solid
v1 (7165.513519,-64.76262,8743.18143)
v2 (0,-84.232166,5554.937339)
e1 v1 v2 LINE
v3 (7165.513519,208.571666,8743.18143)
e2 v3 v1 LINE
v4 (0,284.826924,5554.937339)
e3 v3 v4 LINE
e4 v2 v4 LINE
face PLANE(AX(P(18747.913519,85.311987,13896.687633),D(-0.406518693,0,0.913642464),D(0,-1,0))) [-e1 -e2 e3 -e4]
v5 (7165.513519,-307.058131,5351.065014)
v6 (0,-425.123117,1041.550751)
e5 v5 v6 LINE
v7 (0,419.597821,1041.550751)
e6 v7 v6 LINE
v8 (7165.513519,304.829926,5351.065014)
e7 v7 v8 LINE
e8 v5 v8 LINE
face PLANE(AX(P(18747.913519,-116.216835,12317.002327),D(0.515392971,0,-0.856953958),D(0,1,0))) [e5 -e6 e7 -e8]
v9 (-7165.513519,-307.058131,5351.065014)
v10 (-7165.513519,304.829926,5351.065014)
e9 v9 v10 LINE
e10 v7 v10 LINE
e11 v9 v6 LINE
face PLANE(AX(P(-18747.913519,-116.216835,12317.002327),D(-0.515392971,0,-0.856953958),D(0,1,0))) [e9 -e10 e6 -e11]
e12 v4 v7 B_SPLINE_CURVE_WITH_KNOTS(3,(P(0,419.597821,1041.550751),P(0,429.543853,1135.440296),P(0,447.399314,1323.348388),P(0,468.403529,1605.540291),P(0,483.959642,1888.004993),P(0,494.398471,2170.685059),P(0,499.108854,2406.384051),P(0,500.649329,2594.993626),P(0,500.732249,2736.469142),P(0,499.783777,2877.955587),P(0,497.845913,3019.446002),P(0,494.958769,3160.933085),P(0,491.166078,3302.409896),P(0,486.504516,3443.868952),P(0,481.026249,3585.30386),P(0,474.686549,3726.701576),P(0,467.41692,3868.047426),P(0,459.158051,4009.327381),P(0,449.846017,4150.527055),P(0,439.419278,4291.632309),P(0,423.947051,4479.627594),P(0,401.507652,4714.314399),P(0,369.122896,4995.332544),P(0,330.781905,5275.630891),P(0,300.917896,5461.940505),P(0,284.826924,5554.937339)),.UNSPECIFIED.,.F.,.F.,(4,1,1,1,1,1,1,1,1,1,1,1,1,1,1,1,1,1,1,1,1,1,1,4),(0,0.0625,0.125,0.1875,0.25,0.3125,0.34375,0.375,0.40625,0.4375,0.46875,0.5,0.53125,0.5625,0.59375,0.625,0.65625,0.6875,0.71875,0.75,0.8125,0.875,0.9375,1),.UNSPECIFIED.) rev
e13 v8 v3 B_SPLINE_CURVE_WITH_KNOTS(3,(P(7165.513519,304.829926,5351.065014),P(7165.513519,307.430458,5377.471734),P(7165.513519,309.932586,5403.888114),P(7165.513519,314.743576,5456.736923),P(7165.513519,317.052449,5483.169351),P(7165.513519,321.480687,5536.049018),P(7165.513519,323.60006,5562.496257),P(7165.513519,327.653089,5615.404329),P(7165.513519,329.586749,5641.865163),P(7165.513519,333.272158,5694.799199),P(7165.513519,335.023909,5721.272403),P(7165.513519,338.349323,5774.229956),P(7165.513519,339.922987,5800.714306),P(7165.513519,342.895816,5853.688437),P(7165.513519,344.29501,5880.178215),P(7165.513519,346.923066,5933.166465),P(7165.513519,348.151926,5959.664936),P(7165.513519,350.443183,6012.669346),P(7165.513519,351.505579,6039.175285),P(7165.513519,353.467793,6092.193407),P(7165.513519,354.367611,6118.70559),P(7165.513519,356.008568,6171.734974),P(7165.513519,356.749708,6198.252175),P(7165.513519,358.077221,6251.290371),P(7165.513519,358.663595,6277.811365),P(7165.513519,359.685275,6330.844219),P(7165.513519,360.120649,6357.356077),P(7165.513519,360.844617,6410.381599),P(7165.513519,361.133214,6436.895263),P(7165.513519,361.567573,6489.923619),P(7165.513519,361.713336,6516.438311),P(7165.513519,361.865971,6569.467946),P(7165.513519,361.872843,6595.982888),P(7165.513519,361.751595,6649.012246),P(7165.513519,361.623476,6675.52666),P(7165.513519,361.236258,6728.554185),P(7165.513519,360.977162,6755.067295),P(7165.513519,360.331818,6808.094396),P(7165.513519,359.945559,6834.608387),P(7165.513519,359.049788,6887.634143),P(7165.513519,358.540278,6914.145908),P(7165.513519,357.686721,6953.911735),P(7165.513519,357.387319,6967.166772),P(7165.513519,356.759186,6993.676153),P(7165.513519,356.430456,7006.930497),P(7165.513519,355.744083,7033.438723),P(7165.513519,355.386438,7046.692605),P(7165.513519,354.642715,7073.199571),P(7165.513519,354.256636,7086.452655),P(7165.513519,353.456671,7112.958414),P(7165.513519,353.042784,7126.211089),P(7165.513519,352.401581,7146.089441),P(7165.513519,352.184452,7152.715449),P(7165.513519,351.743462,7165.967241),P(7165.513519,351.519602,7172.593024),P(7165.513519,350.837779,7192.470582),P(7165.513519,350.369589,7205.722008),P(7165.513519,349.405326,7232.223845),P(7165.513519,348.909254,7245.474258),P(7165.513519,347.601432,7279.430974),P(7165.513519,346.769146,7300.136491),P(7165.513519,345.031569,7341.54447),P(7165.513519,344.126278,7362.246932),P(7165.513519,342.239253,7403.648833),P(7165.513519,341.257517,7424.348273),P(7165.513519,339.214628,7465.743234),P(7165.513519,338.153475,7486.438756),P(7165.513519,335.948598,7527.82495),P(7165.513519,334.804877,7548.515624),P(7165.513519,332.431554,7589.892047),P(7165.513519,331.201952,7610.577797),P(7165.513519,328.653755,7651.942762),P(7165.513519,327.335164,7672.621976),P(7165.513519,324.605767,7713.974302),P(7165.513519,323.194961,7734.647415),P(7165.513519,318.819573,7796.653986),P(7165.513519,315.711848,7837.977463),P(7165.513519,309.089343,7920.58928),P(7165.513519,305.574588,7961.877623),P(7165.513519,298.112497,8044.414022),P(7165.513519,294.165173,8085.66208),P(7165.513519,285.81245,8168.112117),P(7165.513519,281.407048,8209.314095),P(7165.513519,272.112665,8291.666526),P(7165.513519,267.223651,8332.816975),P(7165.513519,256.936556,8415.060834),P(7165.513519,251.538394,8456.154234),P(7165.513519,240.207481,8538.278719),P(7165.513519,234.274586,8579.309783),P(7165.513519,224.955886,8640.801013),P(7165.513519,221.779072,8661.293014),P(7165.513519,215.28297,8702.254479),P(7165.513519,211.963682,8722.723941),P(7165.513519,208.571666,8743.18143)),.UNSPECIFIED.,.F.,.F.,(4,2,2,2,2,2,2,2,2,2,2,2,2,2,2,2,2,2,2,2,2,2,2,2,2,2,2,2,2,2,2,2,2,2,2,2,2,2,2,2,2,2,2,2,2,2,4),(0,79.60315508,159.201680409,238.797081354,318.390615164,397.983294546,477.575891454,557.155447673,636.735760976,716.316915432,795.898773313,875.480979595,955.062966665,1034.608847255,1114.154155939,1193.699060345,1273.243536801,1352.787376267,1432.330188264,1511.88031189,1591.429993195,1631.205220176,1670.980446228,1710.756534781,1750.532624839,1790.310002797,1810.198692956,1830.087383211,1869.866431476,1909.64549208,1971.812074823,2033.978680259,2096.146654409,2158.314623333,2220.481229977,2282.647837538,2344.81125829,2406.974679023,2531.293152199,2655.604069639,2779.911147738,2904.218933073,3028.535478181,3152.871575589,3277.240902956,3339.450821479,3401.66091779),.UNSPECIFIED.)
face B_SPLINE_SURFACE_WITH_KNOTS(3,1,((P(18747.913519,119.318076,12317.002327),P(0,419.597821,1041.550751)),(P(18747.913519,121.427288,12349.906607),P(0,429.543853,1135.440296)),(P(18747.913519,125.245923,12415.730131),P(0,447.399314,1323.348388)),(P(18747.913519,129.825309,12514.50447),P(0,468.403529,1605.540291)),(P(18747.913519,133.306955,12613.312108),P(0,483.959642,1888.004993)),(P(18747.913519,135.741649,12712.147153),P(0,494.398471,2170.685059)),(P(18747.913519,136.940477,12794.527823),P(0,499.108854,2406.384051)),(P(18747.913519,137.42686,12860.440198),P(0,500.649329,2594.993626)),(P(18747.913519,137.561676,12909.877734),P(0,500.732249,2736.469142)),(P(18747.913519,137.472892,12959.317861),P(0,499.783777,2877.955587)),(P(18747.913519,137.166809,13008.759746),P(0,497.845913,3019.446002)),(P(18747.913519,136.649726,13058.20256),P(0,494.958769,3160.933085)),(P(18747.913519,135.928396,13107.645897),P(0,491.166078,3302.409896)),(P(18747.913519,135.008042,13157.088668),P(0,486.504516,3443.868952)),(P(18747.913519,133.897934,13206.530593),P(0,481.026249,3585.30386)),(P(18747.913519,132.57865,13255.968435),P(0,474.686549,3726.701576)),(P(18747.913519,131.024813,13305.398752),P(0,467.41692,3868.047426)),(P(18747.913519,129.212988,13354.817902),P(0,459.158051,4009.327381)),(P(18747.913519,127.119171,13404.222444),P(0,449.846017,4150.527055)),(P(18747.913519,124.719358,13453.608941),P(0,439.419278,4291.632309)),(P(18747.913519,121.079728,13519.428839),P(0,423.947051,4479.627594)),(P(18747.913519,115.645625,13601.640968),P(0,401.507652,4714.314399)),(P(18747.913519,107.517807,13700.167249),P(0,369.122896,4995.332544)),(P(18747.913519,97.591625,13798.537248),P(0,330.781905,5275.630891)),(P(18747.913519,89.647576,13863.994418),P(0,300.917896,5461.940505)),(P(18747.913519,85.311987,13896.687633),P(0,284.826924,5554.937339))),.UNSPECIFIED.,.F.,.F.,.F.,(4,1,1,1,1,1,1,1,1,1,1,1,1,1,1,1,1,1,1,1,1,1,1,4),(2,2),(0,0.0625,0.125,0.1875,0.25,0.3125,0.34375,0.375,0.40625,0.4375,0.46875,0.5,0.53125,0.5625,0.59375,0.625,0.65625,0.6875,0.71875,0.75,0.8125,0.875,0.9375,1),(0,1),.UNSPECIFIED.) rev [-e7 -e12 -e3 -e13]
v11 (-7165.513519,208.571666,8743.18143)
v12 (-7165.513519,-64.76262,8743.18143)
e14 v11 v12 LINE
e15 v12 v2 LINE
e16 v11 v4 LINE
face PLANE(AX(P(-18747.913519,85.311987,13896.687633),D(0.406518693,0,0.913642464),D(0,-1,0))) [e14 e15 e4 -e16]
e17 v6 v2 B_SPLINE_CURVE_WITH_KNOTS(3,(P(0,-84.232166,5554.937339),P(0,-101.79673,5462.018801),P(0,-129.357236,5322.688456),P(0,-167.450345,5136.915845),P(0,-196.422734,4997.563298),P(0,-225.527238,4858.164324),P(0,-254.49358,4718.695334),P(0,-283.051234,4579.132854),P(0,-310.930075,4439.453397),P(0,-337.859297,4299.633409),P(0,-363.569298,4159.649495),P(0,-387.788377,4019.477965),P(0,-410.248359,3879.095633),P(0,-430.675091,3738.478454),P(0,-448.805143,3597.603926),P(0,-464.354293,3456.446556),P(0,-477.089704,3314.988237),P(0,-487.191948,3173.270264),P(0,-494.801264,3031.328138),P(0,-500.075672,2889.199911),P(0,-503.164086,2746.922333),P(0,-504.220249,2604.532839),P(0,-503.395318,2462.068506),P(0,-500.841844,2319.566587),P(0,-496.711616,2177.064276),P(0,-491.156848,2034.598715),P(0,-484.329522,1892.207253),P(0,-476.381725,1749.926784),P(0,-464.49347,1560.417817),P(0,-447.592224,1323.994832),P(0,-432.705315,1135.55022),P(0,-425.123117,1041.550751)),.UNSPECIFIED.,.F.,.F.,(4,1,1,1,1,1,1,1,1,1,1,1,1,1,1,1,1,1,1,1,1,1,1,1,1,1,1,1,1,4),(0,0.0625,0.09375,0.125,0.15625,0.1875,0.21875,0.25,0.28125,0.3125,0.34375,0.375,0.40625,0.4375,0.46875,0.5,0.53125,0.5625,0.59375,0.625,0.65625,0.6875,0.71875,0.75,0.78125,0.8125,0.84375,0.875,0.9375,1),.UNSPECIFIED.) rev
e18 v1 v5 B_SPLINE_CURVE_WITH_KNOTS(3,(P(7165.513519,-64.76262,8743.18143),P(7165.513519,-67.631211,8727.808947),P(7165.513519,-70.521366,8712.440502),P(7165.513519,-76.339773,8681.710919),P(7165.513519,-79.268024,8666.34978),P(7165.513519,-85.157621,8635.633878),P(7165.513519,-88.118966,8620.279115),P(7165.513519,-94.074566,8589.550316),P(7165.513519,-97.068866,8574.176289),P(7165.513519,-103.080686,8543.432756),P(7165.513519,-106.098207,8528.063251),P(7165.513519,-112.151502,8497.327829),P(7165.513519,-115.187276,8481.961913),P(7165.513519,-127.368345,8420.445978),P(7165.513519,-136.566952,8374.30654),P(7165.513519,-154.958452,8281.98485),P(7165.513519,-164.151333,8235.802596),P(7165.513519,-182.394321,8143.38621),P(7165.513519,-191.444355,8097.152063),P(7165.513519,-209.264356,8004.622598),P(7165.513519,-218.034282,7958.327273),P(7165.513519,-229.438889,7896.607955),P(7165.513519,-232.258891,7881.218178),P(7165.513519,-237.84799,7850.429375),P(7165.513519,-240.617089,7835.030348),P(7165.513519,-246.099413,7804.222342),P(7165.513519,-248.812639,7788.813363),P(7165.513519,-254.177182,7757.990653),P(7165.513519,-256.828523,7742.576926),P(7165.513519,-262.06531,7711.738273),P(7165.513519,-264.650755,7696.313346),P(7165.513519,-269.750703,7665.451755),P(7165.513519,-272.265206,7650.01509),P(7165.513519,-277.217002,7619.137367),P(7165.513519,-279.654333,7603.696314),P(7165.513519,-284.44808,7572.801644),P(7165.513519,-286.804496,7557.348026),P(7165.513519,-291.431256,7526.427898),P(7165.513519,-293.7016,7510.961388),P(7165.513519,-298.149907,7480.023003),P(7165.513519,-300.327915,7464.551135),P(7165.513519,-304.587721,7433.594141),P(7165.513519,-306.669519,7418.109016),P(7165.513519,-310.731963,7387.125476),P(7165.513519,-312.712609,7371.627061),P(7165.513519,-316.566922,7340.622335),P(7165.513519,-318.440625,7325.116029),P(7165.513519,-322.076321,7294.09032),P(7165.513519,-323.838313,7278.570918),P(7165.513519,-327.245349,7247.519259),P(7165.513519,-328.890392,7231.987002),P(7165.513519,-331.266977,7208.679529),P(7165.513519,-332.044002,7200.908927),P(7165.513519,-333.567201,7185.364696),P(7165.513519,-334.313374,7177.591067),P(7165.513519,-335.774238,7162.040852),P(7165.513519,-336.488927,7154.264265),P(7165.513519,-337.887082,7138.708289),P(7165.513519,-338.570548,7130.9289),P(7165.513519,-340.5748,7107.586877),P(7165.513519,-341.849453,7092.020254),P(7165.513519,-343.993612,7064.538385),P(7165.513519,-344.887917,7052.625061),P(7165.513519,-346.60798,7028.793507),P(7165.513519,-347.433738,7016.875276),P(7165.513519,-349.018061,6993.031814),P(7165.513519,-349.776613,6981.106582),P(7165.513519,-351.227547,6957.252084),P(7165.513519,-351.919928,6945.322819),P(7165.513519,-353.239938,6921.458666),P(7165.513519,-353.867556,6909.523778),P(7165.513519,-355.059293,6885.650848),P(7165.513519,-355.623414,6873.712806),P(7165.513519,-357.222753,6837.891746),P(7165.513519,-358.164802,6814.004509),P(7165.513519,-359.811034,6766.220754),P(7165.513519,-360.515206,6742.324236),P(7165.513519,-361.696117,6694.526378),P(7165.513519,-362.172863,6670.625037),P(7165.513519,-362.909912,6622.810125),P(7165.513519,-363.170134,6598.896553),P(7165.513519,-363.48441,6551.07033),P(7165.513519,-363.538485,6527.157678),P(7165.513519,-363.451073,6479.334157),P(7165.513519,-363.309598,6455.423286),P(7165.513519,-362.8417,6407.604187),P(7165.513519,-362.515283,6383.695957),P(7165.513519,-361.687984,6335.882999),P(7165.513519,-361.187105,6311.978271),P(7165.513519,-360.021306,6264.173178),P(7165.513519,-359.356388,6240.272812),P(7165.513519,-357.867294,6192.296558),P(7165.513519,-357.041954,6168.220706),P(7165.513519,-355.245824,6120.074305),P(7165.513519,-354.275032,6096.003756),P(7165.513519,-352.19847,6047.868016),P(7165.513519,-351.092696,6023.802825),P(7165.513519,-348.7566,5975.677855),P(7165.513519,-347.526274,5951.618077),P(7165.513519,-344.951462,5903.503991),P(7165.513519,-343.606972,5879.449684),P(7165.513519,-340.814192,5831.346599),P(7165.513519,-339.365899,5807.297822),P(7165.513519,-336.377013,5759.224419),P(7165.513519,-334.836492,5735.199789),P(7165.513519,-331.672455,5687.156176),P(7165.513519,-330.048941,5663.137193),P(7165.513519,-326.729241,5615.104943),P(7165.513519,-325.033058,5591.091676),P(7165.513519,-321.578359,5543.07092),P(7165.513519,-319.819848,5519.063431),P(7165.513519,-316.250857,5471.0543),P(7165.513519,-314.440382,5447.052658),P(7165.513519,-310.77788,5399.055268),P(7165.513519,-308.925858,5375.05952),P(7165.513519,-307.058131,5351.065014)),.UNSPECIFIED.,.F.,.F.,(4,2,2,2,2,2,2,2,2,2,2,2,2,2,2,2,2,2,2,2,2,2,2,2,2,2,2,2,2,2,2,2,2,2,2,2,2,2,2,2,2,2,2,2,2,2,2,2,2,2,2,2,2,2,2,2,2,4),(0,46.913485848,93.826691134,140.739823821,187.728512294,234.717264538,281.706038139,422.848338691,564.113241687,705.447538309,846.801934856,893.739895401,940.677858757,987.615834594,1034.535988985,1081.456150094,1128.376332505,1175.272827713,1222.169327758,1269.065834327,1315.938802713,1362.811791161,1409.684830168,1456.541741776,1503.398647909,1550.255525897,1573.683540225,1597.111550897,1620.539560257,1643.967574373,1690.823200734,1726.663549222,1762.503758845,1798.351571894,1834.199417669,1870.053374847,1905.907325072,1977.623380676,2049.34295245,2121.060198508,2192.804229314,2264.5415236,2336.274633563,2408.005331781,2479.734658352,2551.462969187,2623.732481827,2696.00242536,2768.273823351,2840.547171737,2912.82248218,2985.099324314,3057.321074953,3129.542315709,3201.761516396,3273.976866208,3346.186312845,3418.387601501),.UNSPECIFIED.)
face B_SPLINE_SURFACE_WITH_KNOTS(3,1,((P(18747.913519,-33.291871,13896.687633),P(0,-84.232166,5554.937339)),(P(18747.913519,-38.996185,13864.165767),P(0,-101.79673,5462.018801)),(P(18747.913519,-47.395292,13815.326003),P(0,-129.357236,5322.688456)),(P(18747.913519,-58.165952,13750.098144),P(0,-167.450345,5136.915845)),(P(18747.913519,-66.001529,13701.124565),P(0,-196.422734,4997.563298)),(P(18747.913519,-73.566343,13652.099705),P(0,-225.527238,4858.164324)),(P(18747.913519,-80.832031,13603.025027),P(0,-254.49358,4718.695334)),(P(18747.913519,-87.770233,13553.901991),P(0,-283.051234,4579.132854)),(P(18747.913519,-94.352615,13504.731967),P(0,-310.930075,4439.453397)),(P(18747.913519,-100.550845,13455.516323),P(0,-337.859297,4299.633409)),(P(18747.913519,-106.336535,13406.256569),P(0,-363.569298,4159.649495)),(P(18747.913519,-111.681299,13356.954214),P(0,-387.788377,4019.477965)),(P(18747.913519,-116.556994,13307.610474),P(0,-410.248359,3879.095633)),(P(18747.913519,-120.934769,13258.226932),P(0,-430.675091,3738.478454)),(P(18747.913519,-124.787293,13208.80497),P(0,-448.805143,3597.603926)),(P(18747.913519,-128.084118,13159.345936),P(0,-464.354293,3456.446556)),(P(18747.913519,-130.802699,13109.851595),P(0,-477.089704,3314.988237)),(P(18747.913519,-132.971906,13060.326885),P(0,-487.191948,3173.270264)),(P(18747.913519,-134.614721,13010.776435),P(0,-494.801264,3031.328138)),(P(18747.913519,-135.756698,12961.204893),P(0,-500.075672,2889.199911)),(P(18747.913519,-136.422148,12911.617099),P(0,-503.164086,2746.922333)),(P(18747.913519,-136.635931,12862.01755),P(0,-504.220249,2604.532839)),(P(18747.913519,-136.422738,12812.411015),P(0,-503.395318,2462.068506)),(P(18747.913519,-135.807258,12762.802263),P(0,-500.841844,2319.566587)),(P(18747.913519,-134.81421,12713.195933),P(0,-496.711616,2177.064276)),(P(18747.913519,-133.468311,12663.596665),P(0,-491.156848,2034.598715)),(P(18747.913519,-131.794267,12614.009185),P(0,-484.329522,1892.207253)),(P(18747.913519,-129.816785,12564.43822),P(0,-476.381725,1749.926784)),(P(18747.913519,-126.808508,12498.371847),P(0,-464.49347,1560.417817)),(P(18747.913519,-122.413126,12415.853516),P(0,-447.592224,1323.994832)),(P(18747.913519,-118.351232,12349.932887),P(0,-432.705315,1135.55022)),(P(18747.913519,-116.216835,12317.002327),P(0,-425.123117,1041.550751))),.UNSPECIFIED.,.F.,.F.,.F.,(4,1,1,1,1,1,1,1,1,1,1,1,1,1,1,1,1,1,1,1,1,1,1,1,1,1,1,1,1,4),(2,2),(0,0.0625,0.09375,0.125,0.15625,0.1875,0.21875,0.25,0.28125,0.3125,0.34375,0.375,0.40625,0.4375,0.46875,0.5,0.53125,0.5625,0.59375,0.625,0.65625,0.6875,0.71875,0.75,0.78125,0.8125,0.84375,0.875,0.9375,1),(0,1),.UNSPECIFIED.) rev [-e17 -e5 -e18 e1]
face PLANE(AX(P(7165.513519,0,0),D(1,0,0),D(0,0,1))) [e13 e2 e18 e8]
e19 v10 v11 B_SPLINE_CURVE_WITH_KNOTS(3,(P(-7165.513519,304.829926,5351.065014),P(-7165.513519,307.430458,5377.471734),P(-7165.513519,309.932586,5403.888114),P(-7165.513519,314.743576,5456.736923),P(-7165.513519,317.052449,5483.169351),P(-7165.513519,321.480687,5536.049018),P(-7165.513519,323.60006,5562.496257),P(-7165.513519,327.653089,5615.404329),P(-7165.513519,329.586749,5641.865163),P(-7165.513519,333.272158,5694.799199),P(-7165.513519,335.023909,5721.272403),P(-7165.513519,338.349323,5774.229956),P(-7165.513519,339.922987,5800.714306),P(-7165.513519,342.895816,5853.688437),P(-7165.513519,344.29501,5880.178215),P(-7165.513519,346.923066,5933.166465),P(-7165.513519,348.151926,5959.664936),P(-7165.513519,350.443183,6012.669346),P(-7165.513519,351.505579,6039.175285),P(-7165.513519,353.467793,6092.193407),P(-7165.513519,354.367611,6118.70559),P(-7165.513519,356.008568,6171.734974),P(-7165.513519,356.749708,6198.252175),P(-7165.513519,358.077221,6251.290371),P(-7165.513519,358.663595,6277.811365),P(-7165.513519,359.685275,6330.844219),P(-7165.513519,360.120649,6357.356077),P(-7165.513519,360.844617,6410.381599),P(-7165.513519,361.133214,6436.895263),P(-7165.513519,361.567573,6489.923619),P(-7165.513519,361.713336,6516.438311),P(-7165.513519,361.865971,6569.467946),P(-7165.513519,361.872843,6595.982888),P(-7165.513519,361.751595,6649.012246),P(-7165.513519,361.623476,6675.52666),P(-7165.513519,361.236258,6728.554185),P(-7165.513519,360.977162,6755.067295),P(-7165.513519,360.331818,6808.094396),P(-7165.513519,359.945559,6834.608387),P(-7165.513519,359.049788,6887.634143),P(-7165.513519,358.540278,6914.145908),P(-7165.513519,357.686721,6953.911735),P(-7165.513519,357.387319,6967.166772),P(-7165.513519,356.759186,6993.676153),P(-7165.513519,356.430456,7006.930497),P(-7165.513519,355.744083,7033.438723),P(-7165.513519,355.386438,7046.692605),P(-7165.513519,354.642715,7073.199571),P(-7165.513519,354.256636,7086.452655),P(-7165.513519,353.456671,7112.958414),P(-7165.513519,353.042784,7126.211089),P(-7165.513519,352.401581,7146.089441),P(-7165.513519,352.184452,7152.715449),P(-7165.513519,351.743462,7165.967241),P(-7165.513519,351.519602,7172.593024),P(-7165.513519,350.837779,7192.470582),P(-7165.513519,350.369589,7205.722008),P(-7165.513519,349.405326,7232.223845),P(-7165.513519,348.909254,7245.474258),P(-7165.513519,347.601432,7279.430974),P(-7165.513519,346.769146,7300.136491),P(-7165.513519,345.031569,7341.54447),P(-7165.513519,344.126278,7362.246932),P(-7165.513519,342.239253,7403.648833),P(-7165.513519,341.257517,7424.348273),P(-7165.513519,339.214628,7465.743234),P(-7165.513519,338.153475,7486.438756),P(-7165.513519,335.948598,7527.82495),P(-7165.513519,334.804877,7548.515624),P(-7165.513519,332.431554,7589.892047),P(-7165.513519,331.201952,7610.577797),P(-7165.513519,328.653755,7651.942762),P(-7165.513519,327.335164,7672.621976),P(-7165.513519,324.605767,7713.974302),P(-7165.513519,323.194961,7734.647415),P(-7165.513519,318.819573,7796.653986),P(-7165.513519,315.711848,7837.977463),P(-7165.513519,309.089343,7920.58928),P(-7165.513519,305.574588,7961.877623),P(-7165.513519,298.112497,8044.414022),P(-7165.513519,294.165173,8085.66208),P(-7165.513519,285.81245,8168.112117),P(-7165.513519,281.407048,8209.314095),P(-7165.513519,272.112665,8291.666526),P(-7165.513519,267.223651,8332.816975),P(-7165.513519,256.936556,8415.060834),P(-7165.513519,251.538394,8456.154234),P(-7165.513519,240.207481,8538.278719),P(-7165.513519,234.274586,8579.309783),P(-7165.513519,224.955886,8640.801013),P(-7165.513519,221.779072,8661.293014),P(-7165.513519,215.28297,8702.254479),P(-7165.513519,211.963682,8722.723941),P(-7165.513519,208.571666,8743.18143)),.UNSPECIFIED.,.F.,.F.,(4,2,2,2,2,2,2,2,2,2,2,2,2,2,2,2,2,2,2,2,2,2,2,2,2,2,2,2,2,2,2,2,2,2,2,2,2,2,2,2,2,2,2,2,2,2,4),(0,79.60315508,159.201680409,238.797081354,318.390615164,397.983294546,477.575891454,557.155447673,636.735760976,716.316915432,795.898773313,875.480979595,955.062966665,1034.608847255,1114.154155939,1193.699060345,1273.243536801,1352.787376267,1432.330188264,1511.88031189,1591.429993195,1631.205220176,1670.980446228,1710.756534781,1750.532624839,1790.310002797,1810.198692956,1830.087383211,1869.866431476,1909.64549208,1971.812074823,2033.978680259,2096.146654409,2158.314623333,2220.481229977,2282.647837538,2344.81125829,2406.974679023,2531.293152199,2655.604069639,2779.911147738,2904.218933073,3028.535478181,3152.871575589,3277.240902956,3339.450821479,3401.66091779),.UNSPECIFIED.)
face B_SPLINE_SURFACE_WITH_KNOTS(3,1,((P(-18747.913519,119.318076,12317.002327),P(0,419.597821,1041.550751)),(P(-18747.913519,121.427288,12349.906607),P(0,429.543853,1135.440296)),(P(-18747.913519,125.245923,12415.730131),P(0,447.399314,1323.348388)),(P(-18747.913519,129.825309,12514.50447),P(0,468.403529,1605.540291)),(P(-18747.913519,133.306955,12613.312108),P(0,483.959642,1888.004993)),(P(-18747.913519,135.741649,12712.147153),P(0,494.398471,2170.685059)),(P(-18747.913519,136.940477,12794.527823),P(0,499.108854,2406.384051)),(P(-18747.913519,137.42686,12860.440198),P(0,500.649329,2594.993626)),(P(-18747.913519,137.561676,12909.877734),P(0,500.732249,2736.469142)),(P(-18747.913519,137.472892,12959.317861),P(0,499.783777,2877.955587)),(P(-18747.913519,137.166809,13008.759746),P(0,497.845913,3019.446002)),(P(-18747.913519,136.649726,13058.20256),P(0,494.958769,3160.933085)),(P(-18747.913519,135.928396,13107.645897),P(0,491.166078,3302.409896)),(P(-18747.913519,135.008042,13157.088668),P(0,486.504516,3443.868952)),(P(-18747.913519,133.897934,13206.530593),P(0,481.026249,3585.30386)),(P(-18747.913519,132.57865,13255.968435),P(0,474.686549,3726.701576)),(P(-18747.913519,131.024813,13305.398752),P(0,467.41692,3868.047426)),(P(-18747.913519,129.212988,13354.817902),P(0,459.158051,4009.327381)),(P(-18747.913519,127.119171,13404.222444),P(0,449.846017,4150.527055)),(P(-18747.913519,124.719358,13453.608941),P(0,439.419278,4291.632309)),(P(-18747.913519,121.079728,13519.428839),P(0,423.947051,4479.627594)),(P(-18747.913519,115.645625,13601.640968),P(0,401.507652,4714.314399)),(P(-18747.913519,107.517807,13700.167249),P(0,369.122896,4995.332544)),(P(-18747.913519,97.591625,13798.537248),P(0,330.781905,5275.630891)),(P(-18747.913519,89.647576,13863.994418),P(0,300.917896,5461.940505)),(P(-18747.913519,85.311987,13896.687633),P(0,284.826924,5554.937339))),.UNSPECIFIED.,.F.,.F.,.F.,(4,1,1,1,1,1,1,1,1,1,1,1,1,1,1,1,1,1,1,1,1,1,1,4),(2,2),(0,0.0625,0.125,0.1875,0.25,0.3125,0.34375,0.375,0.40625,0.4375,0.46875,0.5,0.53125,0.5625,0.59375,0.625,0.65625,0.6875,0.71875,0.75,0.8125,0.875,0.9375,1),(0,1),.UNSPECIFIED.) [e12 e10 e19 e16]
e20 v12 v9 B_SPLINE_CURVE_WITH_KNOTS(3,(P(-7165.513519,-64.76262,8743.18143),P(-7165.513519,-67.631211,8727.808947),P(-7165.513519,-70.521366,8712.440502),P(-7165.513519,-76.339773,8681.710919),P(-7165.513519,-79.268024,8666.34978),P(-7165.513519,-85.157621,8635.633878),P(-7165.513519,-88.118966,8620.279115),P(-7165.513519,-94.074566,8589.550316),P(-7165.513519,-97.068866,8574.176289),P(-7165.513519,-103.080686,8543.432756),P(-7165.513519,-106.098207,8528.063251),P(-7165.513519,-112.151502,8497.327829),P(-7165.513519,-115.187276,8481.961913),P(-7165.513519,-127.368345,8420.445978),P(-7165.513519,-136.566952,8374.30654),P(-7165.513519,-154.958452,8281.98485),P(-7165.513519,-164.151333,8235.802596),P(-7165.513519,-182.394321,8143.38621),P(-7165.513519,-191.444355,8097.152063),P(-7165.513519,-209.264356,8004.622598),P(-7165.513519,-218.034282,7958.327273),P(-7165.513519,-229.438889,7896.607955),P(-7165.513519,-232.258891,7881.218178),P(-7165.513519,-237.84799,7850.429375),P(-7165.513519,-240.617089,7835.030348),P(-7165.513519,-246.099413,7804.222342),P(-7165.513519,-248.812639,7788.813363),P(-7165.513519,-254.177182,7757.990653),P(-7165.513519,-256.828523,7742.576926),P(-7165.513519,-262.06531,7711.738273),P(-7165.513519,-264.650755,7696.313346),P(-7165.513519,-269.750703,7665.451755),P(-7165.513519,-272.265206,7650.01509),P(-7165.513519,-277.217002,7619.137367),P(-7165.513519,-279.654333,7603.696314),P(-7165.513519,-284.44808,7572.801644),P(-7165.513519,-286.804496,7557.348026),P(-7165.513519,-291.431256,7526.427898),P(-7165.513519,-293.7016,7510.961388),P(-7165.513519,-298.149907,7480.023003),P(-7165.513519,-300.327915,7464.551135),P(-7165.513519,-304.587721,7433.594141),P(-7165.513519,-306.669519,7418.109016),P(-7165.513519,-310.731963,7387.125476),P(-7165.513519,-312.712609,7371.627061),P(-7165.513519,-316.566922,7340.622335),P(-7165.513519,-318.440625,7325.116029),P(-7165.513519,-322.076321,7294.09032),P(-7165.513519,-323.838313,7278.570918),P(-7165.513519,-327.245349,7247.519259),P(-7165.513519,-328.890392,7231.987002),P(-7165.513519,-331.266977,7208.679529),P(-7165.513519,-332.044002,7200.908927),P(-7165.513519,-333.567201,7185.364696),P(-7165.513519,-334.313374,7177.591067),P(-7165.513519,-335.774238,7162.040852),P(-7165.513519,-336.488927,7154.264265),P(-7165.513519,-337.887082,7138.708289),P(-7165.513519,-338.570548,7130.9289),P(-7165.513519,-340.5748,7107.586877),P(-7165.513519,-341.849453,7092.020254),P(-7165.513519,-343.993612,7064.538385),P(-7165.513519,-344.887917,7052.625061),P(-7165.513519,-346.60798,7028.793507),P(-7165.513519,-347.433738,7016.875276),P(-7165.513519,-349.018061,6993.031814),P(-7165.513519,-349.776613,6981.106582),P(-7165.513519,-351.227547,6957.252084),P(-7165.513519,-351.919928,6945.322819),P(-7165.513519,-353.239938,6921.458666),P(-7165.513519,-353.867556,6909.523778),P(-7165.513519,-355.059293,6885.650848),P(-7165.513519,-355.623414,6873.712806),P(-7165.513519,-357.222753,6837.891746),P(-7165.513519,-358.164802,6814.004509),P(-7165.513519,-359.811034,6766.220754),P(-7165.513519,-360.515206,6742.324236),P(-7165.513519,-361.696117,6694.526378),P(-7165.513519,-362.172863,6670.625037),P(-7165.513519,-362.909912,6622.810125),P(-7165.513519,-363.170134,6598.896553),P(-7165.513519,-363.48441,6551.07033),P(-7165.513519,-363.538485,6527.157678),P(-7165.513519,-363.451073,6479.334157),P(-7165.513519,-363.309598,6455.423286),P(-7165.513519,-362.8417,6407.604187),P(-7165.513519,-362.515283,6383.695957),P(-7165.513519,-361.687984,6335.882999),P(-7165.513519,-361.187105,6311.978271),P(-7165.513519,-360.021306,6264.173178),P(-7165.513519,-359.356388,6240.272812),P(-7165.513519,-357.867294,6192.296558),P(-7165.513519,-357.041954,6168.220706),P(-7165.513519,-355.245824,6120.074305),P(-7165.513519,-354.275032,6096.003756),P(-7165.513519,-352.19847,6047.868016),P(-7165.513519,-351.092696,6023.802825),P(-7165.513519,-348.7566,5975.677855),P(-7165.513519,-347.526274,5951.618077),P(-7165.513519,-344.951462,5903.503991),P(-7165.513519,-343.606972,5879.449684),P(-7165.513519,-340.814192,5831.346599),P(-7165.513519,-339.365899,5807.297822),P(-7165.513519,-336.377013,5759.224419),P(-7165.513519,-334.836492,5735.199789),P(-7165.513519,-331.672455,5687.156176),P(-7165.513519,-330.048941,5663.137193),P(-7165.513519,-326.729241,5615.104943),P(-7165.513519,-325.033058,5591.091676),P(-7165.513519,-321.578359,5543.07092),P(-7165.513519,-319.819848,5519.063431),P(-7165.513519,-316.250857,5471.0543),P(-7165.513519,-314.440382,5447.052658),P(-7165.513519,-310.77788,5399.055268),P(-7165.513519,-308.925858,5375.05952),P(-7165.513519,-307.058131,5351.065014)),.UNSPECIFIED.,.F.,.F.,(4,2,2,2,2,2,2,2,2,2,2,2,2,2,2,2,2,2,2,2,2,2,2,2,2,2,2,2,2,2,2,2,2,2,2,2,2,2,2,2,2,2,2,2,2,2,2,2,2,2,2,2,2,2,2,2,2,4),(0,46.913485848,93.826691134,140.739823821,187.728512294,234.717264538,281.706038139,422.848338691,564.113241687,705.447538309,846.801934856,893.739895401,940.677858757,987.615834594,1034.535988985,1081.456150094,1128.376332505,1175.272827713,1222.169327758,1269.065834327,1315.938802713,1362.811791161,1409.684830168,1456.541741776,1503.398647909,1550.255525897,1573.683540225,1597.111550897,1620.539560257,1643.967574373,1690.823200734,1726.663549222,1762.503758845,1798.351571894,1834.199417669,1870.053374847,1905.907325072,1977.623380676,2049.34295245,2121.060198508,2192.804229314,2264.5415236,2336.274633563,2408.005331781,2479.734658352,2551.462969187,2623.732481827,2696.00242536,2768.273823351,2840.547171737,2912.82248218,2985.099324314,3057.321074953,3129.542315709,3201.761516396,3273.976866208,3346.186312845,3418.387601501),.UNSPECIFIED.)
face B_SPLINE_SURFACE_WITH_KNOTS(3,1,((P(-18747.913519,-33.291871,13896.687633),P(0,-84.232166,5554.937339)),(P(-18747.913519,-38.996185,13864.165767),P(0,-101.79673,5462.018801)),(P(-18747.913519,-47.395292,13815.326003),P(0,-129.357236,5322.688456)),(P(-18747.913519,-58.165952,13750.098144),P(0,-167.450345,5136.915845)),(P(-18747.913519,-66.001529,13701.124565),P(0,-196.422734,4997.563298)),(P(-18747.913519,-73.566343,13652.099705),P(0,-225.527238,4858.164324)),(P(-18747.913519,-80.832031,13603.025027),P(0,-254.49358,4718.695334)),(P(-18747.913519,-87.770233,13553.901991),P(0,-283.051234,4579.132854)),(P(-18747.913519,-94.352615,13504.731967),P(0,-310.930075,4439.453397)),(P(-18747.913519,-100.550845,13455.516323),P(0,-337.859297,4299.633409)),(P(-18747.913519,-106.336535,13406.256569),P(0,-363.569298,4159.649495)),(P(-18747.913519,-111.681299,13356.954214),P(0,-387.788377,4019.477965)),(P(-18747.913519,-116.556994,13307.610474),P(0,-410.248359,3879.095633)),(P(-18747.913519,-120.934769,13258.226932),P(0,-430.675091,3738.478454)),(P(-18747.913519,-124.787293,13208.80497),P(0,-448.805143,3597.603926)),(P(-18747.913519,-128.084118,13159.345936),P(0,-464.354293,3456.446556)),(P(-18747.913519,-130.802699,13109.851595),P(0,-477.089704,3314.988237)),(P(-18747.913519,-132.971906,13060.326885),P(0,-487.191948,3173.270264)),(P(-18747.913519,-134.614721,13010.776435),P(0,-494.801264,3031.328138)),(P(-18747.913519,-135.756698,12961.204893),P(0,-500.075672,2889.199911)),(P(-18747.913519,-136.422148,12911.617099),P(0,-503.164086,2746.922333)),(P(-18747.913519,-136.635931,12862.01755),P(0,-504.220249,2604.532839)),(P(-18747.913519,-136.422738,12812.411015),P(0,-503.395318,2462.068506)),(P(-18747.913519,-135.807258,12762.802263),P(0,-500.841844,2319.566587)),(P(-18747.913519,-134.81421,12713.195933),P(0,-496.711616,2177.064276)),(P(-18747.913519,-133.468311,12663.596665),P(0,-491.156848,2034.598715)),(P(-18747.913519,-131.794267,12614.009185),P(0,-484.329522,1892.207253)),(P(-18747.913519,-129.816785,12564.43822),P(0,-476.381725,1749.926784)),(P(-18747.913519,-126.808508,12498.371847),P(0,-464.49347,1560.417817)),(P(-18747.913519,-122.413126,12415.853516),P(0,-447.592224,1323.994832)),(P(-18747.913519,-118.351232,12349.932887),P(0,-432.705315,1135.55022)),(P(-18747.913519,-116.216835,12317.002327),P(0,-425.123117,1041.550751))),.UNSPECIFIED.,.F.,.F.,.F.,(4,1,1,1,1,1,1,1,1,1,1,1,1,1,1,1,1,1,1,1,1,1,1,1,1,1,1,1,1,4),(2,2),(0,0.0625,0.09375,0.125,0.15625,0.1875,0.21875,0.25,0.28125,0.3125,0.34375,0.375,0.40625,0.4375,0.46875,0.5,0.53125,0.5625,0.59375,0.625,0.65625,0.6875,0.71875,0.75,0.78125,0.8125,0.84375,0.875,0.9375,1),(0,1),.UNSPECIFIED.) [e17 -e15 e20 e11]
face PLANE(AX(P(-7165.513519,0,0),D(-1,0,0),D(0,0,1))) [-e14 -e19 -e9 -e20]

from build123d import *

# Parameters (mm, degrees)
SKETCH4_W          = 14453.89622635
SKETCH4_H          = 1933.47388346
CUT_EXTRUDE1_DEPTH = 11582.4


with BuildPart() as part:
    # Surface-Knit3: read off the stored shape, not the designer's step
    # Surface-Knit3: loft between two sections, ruled curve by curve
    surface_knit3_from = [
        Edge.make_bspline([(-18747.913519228, -33.291870667, 13896.687632722), (-18747.913519228, -38.996184814, 13864.165767164), (-18747.913519228, -47.395291612, 13815.326003064), (-18747.913519228, -58.165952375, 13750.098143781), (-18747.913519228, -66.001529187, 13701.124565247), (-18747.913519228, -73.566342631, 13652.099705476), (-18747.913519228, -80.832031101, 13603.025026666), (-18747.913519228, -87.770232991, 13553.901991014), (-18747.913519228, -94.352615351, 13504.731967053), (-18747.913519228, -100.550845229, 13455.516323317), (-18747.913519228, -106.336535483, 13406.256569089), (-18747.913519228, -111.681298966, 13356.954213653), (-18747.913519229, -116.556993503, 13307.61047422), (-18747.913519228, -120.934768836, 13258.226931647), (-18747.913519228, -124.787293043, 13208.804970061), (-18747.913519228, -128.084117978, 13159.345935701), (-18747.913519228, -130.802699249, 13109.851595466), (-18747.913519228, -132.971906369, 13060.326885108), (-18747.913519228, -134.6147206, 13010.776434683), (-18747.913519229, -135.756697629, 12961.204893031), (-18747.913519228, -136.422147725, 12911.6170991), (-18747.913519228, -136.635930916, 12862.017549986), (-18747.913519229, -136.422737614, 12812.411014843), (-18747.913519229, -135.807258229, 12762.802262828), (-18747.913519228, -134.814210194, 12713.195933045), (-18747.913519229, -133.468310939, 12663.596664599), (-18747.913519229, -131.794267082, 12614.009184506), (-18747.913519228, -129.816785237, 12564.438219781), (-18747.913519228, -126.808507959, 12498.371846627), (-18747.913519229, -122.413125762, 12415.853516057), (-18747.913519228, -118.351231597, 12349.932887402), (-18747.913519228, -116.216834875, 12317.002326935)], [0, 0, 0, 0, 0.0625, 0.09375, 0.125, 0.15625, 0.1875, 0.21875, 0.25, 0.28125, 0.3125, 0.34375, 0.375, 0.40625, 0.4375, 0.46875, 0.5, 0.53125, 0.5625, 0.59375, 0.625, 0.65625, 0.6875, 0.71875, 0.75, 0.78125, 0.8125, 0.84375, 0.875, 0.9375, 1, 1, 1, 1], 3),
        Edge.make_bspline([(-18747.913519228, 119.318075617, 12317.002326935), (-18747.913519228, 121.427288002, 12349.906607435), (-18747.913519229, 125.245922776, 12415.730130778), (-18747.913519228, 129.825309485, 12514.504470047), (-18747.913519228, 133.30695484, 12613.31210814), (-18747.913519229, 135.741648881, 12712.147152624), (-18747.913519228, 136.940477423, 12794.527823229), (-18747.913519228, 137.426859553, 12860.440198394), (-18747.913519229, 137.561675928, 12909.877734467), (-18747.913519228, 137.472892207, 12959.317860595), (-18747.913519228, 137.166808865, 13008.759745982), (-18747.913519229, 136.649726377, 13058.202559828), (-18747.913519228, 135.92839574, 13107.645897141), (-18747.913519229, 135.008041704, 13157.088667935), (-18747.913519228, 133.897934193, 13206.530592909), (-18747.913519229, 132.578650086, 13255.9684353), (-18747.913519228, 131.024813307, 13305.398752426), (-18747.913519229, 129.212987855, 13354.817901918), (-18747.913519229, 127.119170545, 13404.222444449), (-18747.913519228, 124.719358193, 13453.608940689), (-18747.913519228, 121.079727689, 13519.428839404), (-18747.913519229, 115.645624536, 13601.640967503), (-18747.913519228, 107.517806813, 13700.167248777), (-18747.913519228, 97.591624664, 13798.537247751), (-18747.913519228, 89.647575896, 13863.994418396), (-18747.913519228, 85.311986798, 13896.687632722)], [0, 0, 0, 0, 0.0625, 0.125, 0.1875, 0.25, 0.3125, 0.34375, 0.375, 0.40625, 0.4375, 0.46875, 0.5, 0.53125, 0.5625, 0.59375, 0.625, 0.65625, 0.6875, 0.71875, 0.75, 0.8125, 0.875, 0.9375, 1, 1, 1, 1], 3),
        Edge.make_line((-18747.913519228, -116.216834875, 12317.002326935), (-18747.913519228, 119.318075617, 12317.002326935)),
        Edge.make_line((-18747.913519228, 85.311986798, 13896.687632722), (-18747.913519228, -33.291870667, 13896.687632722)),
    ]
    surface_knit3_to = [
        Edge.make_bspline([(0, -84.232166366, 5554.937339031), (0, -101.79672971, 5462.01880107), (0, -129.357236092, 5322.688455814), (0, -167.450345309, 5136.915845411), (0, -196.42273433, 4997.563298319), (0, -225.527238329, 4858.164324098), (0, -254.493580408, 4718.695334102), (0, -283.051234262, 4579.132854165), (0, -310.930075038, 4439.453396797), (0, -337.859297077, 4299.633408984), (0, -363.569297954, 4159.649494874), (0, -387.788376954, 4019.477965049), (0, -410.248359478, 3879.095632891), (0, -430.67509131, 3738.47845439), (0, -448.805142559, 3597.603925682), (0, -464.354292773, 3456.446555804), (0, -477.089703526, 3314.988236979), (0, -487.191948377, 3173.270264273), (0, -494.801263778, 3031.328137811), (0, -500.07567179, 2889.199911148), (0, -503.164086093, 2746.922333211), (0, -504.220248686, 2604.532838899), (0, -503.395317672, 2462.068506491), (0, -500.841843712, 2319.566586545), (0, -496.711615776, 2177.064276035), (0, -491.156848446, 2034.598715165), (0, -484.32952174, 1892.20725343), (0, -476.381724655, 1749.92678358), (0, -464.49346954, 1560.417817143), (0, -447.592223813, 1323.994831696), (0, -432.705315369, 1135.550220194), (0, -425.123116762, 1041.550751068)], [0, 0, 0, 0, 0.0625, 0.09375, 0.125, 0.15625, 0.1875, 0.21875, 0.25, 0.28125, 0.3125, 0.34375, 0.375, 0.40625, 0.4375, 0.46875, 0.5, 0.53125, 0.5625, 0.59375, 0.625, 0.65625, 0.6875, 0.71875, 0.75, 0.78125, 0.8125, 0.84375, 0.875, 0.9375, 1, 1, 1, 1], 3),
        Edge.make_bspline([(0, 419.597820632, 1041.550751068), (0, 429.543853386, 1135.440295654), (0, 447.399313962, 1323.348388039), (0, 468.40352921, 1605.540291192), (0, 483.959642332, 1888.004992674), (0, 494.398471436, 2170.685059083), (0, 499.108853625, 2406.384051023), (0, 500.649329193, 2594.993626218), (0, 500.73224947, 2736.469141906), (0, 499.783776553, 2877.955586877), (0, 497.845912984, 3019.446002413), (0, 494.958769462, 3160.933085391), (0, 491.166077703, 3302.409896298), (0, 486.504516068, 3443.868951949), (0, 481.026248706, 3585.30385973), (0, 474.686548897, 3726.701576336), (0, 467.416919745, 3868.047425633), (0, 459.158051456, 4009.327380859), (0, 449.846016915, 4150.527054909), (0, 439.419277989, 4291.632309199), (0, 423.947050764, 4479.627594019), (0, 401.507651798, 4714.314399047), (0, 369.122895613, 4995.332543897), (0, 330.781905006, 5275.630891051), (0, 300.917896127, 5461.940505183), (0, 284.826924337, 5554.937339031)], [0, 0, 0, 0, 0.0625, 0.125, 0.1875, 0.25, 0.3125, 0.34375, 0.375, 0.40625, 0.4375, 0.46875, 0.5, 0.53125, 0.5625, 0.59375, 0.625, 0.65625, 0.6875, 0.71875, 0.75, 0.8125, 0.875, 0.9375, 1, 1, 1, 1], 3),
        Edge.make_line((0, -425.123116762, 1041.550751068), (0, 419.597820632, 1041.550751068)),
        Edge.make_line((0, 284.826924337, 5554.937339031), (0, -84.232166366, 5554.937339031)),
    ]
    surface_knit3 = Solid(Shell([*[Face.make_surface_from_curves(surface_knit3_from[k], surface_knit3_to[k]) for k in range(4)], Face(Wire(surface_knit3_from)), Face(Wire(surface_knit3_to))]))
    add(surface_knit3)

    # Sketch4 → Cut-Extrude1 (cut)
    with BuildSketch(Plane(origin=(-18747.913519229, 0, 0), x_dir=(0, 0, -1), z_dir=(1, 0, 0))):
        with Locations((-7774.786517892, 36.739287504)):
            Rectangle(SKETCH4_W, SKETCH4_H)
    extrude(amount=CUT_EXTRUDE1_DEPTH, mode=Mode.SUBTRACT)

    # Mirror1: part across plane


with BuildPart() as part_1:
    add(part.part)
    add(part.part.mirror(Plane(origin=(0, 0, 0), x_dir=(0, 0, 1), z_dir=(1, 0, 0))))


solid = part_1.part
